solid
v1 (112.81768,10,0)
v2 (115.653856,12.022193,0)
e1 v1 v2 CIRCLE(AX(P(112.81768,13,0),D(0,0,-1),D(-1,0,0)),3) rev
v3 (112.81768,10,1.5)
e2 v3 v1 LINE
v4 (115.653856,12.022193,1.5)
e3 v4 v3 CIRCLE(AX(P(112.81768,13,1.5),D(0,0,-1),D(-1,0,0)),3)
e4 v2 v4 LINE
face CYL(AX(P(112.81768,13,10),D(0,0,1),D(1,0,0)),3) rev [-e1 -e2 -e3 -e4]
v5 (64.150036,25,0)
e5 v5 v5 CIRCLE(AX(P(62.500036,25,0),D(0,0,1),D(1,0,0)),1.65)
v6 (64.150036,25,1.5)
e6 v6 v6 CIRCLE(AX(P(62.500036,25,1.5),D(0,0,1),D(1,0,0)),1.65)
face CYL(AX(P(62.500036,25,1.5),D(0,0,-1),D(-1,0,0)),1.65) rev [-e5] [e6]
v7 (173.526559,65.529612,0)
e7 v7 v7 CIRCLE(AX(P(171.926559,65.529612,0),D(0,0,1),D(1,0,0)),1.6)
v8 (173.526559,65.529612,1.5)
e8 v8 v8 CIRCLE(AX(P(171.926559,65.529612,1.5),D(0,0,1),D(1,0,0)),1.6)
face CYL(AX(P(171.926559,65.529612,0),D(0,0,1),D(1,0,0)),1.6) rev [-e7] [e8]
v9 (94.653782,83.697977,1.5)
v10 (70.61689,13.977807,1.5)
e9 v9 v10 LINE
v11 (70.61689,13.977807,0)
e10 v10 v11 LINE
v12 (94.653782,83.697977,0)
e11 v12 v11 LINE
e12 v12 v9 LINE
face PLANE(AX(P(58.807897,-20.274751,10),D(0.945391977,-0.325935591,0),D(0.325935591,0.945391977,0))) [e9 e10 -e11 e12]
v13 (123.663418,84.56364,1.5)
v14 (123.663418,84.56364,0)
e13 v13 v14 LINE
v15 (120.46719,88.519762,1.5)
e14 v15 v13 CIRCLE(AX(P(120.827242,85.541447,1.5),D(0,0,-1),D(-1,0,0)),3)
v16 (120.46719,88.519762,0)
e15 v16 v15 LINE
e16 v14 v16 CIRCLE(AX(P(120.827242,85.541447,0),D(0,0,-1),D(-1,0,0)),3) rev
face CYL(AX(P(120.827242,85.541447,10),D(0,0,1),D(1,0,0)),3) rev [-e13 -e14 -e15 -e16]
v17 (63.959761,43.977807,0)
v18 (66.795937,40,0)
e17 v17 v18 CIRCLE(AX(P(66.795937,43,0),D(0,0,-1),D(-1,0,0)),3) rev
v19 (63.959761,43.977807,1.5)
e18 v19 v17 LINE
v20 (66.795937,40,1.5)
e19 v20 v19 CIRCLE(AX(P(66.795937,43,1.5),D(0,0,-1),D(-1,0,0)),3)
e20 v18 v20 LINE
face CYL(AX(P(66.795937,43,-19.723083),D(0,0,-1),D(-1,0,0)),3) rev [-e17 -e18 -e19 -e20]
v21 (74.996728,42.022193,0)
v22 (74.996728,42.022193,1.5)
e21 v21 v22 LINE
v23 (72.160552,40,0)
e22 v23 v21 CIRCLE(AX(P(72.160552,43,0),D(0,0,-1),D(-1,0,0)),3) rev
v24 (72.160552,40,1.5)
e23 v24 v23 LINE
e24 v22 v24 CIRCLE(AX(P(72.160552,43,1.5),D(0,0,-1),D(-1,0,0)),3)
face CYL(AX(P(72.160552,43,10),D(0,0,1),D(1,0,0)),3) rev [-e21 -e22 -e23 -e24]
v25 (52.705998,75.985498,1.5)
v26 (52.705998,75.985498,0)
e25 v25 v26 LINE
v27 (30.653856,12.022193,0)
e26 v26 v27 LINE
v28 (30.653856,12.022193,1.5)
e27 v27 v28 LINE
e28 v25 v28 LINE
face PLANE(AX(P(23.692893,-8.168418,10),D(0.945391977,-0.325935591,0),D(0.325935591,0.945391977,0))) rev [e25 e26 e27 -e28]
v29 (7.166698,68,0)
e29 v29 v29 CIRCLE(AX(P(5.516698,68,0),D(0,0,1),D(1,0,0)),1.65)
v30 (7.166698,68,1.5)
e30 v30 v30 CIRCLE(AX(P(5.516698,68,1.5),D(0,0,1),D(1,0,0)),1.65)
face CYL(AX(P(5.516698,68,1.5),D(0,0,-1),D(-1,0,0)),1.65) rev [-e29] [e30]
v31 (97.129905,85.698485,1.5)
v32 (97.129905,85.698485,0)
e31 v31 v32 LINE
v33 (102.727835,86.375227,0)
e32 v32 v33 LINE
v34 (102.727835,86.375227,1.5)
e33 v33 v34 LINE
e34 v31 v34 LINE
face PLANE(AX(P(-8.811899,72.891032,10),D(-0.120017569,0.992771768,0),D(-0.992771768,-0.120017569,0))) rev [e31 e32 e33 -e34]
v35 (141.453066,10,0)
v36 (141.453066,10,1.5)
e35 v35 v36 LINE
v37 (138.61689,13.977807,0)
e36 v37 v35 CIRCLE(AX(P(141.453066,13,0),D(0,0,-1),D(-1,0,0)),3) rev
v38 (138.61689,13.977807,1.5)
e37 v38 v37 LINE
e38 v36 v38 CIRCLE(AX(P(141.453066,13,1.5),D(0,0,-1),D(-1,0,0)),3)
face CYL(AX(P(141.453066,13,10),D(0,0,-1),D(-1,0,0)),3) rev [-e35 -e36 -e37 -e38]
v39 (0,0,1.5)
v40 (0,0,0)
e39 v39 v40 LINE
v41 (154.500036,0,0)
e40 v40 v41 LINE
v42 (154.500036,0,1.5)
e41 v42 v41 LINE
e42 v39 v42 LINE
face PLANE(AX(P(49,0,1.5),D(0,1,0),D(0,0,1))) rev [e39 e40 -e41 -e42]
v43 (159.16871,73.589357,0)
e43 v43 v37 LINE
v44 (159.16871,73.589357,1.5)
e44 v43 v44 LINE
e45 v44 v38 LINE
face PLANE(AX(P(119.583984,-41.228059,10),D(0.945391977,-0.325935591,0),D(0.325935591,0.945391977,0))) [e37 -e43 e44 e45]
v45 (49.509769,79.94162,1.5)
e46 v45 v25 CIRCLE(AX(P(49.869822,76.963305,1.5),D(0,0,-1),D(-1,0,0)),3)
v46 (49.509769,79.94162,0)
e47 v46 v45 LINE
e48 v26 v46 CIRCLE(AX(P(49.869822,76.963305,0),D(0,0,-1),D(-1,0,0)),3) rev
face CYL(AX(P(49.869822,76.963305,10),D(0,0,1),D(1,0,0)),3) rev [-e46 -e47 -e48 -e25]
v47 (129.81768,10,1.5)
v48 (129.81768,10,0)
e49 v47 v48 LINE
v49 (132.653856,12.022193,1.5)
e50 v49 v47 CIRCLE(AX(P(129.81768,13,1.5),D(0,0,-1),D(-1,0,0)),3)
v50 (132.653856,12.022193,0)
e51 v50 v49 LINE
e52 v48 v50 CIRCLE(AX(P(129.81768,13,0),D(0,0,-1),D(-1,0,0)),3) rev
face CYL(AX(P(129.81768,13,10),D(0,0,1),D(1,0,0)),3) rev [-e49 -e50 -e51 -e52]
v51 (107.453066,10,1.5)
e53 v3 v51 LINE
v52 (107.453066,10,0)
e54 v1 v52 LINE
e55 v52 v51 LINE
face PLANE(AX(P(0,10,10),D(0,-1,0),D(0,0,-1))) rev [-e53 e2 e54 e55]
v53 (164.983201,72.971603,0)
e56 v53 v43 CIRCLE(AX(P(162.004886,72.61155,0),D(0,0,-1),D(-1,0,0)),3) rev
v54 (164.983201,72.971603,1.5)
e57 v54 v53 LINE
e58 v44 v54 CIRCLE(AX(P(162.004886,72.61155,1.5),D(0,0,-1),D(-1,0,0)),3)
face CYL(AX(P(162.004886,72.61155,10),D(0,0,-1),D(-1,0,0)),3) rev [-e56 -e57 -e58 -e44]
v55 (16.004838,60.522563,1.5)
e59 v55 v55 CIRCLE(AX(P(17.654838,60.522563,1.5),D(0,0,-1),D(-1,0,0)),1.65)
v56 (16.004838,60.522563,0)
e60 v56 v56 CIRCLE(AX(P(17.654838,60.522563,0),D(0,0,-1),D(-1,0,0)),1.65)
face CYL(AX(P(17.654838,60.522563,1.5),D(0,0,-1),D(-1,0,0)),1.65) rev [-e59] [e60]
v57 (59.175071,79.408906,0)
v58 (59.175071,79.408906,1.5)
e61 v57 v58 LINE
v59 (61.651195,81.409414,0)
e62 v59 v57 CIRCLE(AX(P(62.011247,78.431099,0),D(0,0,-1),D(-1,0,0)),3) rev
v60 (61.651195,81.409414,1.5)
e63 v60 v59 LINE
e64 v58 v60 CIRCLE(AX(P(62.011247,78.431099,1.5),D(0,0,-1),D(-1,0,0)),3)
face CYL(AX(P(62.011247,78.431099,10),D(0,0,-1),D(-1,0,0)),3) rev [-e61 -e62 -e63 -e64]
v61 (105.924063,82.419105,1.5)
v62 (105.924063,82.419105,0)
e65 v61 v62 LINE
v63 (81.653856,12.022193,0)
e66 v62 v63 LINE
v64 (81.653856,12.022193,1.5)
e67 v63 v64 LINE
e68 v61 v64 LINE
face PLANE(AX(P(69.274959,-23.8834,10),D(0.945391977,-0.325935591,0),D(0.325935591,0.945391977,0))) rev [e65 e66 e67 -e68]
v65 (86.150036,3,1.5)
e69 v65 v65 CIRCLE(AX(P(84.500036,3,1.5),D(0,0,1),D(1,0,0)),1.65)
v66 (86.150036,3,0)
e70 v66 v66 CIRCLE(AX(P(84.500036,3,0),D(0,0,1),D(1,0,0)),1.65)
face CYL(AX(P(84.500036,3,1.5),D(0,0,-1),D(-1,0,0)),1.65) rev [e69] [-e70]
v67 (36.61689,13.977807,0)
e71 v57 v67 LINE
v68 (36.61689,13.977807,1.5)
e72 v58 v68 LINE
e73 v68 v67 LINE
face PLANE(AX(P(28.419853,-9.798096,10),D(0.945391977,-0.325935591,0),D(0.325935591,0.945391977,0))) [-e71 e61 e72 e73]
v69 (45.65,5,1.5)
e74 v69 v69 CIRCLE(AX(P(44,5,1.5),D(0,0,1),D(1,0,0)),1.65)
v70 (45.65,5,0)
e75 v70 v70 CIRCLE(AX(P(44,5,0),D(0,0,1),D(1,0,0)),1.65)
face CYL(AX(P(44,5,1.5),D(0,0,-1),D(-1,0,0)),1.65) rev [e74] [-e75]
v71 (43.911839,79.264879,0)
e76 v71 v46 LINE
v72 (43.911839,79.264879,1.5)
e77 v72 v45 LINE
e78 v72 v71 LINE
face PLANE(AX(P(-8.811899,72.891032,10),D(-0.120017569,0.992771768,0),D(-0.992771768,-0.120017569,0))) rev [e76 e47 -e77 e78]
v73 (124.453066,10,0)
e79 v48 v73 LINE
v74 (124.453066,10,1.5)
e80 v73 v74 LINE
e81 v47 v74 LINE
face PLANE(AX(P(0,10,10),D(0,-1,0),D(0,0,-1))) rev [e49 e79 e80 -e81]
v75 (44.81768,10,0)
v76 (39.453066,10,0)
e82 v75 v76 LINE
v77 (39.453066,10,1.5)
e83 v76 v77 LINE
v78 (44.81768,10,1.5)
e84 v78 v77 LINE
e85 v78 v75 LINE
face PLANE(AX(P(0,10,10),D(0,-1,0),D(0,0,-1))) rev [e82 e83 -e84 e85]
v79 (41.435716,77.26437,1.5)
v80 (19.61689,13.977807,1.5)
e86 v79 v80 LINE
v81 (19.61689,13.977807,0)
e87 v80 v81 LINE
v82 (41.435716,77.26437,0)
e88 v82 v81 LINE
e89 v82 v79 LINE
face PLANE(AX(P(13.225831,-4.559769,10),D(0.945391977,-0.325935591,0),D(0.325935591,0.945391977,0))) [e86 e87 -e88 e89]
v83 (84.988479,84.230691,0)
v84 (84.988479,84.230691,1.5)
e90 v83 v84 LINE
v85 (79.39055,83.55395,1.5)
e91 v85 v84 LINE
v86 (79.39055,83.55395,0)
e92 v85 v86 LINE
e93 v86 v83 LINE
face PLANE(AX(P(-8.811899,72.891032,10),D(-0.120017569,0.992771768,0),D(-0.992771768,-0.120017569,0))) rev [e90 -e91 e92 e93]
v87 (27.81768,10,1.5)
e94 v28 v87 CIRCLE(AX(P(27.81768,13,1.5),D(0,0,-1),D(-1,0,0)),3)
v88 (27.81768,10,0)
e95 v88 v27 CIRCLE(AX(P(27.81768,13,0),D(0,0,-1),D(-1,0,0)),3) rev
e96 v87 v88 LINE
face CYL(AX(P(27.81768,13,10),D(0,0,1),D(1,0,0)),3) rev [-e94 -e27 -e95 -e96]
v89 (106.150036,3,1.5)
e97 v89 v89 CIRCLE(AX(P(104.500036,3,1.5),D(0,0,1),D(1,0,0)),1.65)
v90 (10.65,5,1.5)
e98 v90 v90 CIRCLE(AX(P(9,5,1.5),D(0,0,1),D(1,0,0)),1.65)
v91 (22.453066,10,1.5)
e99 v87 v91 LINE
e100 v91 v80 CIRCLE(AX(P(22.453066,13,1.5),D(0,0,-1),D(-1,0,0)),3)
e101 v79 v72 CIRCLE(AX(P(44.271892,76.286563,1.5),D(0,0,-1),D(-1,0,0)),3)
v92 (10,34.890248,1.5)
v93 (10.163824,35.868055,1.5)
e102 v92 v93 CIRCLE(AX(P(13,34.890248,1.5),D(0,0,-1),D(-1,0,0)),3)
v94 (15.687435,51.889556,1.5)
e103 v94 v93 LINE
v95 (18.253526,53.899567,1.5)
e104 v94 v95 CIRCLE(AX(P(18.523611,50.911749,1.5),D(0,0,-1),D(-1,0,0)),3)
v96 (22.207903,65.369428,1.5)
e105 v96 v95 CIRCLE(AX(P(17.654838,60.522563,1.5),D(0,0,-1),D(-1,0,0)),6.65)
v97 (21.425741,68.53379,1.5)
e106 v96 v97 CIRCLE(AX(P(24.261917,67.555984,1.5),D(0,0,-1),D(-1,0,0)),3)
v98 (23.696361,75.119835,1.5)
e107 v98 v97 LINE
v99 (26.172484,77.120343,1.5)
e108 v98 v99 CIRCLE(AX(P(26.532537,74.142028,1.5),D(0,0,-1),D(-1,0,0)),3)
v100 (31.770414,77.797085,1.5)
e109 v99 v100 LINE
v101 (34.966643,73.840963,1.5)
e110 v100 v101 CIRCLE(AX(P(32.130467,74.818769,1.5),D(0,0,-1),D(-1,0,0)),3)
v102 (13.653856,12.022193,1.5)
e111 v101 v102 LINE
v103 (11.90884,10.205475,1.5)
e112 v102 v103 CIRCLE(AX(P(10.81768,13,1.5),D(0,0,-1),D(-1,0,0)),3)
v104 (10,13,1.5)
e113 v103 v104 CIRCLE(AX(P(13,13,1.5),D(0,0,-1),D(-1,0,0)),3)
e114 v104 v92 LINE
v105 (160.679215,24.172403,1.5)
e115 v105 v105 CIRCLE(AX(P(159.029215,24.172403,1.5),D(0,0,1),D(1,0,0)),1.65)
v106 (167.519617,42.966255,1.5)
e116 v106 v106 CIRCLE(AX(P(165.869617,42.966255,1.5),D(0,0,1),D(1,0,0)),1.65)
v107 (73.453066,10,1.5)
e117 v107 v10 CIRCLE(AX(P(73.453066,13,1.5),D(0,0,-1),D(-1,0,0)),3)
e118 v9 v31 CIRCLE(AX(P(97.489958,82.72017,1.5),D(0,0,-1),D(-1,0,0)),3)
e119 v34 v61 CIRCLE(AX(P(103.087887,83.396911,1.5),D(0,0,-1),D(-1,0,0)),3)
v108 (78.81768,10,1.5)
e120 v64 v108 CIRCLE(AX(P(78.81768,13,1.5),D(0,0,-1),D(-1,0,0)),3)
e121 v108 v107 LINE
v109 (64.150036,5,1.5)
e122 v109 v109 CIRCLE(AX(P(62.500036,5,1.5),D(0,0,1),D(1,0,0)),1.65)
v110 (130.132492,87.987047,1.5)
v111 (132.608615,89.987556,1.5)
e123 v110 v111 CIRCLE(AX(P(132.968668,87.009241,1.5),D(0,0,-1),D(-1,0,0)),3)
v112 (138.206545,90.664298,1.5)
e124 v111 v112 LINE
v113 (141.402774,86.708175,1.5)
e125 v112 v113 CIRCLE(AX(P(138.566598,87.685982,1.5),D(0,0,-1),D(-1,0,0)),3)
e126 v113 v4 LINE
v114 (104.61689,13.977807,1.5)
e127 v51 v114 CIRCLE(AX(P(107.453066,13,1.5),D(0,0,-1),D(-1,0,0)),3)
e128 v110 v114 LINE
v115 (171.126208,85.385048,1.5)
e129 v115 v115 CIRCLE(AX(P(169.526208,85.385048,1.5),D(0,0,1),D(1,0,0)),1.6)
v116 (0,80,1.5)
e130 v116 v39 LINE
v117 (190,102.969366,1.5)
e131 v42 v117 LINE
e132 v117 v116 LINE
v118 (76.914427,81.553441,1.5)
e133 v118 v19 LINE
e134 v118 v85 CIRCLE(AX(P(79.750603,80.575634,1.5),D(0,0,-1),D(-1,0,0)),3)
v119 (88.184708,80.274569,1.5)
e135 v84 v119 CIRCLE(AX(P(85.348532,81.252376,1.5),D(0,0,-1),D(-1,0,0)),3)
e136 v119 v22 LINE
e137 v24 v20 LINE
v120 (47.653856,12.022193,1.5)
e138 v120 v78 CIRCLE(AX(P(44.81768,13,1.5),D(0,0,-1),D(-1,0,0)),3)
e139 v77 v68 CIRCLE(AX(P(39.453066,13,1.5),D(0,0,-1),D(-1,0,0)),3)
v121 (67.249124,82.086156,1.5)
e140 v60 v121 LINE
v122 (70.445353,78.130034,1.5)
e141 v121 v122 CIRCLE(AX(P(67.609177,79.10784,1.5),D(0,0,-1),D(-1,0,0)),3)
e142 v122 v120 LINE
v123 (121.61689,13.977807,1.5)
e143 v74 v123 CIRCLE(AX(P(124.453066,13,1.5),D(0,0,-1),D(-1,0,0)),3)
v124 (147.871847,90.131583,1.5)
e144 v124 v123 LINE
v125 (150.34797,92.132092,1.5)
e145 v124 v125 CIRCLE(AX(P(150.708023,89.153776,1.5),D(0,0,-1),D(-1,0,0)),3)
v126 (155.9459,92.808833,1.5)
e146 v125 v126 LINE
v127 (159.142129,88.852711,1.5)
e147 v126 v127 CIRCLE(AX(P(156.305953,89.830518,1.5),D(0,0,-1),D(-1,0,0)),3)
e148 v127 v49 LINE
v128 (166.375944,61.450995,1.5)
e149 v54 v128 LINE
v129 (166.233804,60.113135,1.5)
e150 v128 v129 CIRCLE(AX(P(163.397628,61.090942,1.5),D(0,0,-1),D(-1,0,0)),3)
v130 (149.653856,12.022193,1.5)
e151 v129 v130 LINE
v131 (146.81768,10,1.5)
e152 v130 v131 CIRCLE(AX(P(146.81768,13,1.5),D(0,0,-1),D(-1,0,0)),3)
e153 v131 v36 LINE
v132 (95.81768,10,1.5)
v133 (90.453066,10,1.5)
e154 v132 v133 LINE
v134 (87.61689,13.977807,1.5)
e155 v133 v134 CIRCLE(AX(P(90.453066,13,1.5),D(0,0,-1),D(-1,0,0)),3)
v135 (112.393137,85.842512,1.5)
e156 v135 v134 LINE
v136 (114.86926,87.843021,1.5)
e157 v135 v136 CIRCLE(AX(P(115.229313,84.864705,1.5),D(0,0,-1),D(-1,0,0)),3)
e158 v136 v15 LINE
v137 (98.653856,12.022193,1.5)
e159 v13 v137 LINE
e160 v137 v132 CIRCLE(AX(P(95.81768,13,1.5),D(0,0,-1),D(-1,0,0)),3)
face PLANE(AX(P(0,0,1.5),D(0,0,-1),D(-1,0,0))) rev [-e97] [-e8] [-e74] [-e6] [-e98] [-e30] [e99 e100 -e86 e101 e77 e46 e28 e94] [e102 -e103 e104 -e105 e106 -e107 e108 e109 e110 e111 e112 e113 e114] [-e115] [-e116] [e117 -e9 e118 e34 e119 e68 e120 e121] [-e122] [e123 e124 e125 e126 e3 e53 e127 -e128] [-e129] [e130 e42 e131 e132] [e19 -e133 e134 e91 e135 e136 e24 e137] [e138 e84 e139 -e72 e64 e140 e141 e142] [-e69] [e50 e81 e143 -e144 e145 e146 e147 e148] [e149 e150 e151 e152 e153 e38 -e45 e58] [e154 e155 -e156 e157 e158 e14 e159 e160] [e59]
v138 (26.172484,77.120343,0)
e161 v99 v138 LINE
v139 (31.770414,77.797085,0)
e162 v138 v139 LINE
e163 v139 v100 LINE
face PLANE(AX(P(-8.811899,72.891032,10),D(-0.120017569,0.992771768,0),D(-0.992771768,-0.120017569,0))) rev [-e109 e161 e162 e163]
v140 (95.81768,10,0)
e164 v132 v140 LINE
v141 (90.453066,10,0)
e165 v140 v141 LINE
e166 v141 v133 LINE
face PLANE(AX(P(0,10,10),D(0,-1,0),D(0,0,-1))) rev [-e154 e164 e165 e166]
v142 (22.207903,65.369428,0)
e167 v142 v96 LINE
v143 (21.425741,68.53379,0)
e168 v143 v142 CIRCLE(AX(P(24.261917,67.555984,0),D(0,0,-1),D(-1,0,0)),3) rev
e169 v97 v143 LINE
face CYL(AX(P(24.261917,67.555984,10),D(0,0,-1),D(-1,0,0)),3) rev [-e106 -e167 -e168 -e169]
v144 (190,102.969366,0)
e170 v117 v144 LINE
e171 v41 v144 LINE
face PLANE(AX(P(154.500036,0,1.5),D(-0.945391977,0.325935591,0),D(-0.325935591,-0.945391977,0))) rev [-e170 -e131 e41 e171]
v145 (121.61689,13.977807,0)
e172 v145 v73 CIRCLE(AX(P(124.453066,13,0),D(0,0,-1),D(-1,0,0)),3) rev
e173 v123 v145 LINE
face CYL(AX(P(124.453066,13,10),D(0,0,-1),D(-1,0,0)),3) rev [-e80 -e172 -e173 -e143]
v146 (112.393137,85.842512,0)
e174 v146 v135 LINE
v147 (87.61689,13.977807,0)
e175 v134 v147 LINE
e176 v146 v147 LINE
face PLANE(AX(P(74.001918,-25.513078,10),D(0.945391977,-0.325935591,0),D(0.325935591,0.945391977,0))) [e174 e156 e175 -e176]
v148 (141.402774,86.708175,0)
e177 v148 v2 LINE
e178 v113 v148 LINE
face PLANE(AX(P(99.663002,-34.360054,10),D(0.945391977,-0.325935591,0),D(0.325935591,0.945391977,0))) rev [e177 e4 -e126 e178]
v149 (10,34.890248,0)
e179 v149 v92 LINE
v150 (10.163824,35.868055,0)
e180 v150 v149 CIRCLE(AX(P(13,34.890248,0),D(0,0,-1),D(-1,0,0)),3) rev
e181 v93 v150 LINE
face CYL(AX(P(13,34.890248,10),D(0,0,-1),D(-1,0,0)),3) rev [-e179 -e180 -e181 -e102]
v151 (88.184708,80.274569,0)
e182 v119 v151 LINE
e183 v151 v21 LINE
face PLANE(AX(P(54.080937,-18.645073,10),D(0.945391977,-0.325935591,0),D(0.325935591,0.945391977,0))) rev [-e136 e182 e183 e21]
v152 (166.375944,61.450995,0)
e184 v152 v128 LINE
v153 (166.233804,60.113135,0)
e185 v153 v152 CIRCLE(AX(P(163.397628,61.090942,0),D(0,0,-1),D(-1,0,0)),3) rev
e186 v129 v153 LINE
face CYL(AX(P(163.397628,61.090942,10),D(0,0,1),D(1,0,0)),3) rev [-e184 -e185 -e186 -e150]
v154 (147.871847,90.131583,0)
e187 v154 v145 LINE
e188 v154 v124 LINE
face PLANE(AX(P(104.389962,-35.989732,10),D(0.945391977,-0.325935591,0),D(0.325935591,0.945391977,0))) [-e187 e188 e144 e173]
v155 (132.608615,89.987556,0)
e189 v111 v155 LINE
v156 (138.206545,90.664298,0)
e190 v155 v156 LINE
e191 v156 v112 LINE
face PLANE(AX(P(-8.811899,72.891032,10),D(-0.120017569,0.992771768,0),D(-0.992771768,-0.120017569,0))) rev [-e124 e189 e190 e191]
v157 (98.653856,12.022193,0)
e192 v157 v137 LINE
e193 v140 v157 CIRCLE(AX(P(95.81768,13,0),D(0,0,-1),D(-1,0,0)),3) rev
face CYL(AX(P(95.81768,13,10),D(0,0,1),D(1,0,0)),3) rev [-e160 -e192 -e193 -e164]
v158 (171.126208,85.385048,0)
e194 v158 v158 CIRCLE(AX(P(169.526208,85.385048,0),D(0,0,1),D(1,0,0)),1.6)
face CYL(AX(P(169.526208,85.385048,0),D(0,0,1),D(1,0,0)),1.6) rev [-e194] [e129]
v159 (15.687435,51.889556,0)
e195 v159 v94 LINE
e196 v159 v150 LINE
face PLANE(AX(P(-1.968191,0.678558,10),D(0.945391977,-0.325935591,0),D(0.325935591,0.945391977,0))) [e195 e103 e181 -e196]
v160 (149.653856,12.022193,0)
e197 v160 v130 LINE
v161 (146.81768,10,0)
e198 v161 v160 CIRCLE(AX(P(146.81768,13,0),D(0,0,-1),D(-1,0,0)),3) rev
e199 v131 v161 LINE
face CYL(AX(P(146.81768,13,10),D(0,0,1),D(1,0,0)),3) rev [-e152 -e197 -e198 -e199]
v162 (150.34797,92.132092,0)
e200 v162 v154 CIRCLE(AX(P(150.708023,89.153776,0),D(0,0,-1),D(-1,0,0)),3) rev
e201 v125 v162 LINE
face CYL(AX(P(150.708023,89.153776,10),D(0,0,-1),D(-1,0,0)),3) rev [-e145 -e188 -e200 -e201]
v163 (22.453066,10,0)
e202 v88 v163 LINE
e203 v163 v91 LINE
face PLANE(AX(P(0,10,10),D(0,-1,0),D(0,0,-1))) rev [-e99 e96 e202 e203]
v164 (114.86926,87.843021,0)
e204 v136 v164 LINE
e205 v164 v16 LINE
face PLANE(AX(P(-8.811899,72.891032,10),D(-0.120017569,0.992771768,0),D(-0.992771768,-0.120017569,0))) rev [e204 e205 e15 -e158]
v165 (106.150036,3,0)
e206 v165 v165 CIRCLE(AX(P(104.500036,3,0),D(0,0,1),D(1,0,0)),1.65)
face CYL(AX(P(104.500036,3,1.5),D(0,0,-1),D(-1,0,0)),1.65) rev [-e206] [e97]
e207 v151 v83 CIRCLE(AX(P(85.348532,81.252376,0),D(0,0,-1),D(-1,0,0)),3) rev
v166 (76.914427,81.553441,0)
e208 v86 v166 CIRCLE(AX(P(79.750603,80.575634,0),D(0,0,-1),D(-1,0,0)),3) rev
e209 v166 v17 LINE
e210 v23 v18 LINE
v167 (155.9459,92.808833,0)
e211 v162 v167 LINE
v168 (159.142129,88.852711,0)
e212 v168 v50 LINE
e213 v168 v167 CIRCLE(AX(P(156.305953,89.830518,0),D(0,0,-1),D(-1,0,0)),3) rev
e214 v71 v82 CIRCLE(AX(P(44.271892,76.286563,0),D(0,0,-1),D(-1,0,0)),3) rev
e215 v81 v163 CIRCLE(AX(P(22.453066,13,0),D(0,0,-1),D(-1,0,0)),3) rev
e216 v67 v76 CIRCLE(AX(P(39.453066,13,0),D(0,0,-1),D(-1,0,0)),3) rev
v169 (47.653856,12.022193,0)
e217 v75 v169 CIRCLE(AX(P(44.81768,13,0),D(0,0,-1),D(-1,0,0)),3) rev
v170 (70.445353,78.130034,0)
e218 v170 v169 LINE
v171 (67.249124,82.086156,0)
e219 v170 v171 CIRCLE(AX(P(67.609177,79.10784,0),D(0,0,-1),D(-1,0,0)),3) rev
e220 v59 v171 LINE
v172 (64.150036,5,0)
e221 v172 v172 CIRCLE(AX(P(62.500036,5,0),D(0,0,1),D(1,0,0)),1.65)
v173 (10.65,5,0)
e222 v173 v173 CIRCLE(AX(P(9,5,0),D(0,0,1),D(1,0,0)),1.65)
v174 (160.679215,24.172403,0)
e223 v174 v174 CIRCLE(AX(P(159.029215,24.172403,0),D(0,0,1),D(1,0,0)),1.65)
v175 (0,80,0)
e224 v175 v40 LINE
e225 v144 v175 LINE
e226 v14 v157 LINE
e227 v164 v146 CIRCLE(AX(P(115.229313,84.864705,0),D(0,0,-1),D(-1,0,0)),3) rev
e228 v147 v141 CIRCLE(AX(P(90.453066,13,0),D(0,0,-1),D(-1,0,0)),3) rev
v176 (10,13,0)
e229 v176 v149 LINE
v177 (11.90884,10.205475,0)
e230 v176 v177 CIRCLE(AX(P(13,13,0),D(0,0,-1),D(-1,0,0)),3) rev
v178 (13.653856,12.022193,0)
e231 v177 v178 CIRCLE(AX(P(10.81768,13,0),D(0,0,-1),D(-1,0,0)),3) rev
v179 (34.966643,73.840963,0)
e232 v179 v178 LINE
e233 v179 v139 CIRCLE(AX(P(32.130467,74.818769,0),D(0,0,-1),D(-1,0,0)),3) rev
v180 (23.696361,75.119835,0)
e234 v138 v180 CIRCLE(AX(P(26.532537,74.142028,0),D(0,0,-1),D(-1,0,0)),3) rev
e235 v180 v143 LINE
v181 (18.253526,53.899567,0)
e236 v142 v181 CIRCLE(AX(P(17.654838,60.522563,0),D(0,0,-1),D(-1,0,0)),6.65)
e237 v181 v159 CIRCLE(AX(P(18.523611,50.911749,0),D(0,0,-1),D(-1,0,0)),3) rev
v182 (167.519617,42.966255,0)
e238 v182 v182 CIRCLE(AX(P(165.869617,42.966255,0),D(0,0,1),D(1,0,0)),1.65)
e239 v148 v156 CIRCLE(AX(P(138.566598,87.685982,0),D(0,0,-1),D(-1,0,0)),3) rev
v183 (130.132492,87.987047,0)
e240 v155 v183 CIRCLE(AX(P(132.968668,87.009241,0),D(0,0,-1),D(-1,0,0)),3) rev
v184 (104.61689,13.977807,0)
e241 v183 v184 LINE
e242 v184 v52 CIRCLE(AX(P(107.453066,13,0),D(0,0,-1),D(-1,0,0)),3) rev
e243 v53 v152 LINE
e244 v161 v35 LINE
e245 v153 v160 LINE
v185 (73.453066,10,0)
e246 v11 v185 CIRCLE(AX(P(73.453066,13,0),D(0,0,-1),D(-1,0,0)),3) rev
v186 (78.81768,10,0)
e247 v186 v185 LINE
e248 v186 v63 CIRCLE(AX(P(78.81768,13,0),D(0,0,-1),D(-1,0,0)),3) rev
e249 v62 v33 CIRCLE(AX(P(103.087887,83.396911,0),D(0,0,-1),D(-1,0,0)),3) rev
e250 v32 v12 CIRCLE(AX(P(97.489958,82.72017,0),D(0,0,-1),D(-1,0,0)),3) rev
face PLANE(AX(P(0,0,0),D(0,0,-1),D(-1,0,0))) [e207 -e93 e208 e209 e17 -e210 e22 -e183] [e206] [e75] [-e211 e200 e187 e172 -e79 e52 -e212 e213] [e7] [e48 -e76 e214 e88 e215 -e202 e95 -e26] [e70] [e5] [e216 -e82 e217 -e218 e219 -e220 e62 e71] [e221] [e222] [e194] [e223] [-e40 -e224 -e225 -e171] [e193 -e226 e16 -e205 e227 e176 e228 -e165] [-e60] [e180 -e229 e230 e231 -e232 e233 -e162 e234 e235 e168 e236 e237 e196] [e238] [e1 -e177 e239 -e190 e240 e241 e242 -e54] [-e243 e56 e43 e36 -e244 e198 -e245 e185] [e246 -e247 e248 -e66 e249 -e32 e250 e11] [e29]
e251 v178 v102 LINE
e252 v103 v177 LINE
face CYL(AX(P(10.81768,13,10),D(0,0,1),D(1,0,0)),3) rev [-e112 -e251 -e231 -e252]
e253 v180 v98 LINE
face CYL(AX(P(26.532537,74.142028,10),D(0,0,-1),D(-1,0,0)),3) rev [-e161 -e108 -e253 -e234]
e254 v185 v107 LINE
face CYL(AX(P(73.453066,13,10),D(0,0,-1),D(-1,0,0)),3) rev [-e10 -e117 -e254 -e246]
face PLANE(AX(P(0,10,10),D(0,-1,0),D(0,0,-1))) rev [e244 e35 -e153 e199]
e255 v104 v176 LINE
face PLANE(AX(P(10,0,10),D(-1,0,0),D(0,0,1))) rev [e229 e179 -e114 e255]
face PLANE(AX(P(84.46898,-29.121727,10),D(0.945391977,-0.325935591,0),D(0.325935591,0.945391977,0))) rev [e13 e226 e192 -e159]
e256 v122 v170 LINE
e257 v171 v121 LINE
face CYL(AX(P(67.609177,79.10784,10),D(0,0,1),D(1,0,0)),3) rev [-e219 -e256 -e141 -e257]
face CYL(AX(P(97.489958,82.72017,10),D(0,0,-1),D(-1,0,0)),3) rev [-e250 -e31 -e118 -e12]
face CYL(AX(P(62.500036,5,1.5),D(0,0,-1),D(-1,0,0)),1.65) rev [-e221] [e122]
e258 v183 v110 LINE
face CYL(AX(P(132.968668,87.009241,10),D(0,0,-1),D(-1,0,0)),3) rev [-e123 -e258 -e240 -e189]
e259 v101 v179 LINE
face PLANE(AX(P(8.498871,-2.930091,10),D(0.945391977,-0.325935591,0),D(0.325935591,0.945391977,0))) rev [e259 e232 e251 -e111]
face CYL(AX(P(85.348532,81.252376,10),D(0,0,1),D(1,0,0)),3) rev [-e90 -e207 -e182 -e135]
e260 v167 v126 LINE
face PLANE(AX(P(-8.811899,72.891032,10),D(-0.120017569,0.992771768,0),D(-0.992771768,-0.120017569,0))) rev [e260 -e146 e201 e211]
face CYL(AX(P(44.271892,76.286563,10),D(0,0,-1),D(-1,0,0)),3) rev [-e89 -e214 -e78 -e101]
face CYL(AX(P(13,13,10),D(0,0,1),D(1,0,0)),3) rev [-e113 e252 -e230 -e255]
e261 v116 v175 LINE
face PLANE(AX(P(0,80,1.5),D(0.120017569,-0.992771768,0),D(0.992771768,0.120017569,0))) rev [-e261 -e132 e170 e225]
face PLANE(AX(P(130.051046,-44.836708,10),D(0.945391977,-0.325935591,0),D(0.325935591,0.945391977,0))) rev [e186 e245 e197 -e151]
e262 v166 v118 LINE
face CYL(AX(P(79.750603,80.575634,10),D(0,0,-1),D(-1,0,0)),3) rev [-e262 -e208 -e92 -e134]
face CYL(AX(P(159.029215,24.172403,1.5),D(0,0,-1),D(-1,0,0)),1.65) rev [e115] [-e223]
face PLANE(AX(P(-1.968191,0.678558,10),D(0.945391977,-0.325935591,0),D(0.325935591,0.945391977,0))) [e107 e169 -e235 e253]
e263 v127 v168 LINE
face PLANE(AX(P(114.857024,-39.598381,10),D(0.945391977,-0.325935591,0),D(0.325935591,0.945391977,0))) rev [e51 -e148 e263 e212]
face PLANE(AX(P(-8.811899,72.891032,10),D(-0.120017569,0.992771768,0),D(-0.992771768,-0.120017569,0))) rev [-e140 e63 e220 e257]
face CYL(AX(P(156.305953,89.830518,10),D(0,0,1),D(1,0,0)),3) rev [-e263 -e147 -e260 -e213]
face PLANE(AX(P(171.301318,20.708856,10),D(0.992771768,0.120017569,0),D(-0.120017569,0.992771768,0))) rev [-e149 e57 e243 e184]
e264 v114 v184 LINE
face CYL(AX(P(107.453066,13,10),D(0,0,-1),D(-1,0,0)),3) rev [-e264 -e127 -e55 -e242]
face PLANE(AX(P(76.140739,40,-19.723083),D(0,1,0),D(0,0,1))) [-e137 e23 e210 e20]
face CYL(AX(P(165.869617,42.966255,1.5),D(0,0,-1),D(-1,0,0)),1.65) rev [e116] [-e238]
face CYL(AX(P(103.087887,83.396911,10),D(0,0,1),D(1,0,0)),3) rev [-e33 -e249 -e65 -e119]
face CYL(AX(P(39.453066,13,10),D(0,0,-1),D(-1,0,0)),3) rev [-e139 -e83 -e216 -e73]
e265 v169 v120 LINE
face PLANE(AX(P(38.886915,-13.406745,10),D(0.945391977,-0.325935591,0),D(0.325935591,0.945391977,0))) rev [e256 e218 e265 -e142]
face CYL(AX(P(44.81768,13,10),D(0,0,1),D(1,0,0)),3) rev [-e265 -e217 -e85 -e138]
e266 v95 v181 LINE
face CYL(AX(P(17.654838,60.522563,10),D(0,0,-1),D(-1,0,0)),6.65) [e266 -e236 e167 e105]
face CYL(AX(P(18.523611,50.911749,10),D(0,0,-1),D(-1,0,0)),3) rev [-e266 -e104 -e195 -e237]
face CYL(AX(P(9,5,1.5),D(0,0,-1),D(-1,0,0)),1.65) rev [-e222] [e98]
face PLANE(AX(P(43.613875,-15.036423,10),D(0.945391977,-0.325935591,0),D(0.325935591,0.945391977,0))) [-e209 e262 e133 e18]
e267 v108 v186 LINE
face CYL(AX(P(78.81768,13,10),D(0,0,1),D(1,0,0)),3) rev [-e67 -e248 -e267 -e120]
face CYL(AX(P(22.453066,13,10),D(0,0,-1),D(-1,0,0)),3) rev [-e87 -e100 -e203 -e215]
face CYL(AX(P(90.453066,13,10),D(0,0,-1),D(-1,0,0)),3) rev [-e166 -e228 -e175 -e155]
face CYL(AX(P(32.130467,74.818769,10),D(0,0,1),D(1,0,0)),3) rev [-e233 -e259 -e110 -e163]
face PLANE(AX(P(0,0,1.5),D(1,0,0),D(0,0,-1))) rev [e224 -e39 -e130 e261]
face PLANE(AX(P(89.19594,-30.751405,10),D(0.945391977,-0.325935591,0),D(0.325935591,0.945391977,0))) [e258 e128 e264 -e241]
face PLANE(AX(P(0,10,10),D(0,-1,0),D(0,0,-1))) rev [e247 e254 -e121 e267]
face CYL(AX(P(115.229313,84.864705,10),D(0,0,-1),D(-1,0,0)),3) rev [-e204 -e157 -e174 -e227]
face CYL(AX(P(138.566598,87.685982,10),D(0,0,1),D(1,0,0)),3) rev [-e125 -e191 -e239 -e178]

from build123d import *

# Parameters (mm, degrees)
SKETCH_1_R          = 1.65
EXTRUDE_1_DEPTH     = 1.5
SKETCH_2_R          = 1.65
CUT_EXTRUDE_1_DEPTH = 217.113258134
SKETCH_5_R          = 1.6
CUT_EXTRUDE_3_DEPTH = 217.113258134
CUT_EXTRUDE_4_DEPTH = 10
FILLET_3_R          = 3
FILLET_4_R          = 5
SKETCH_7_W          = 17
SKETCH_7_H          = 10
EXTRUDE_2_DEPTH     = 1.5
FILLET_5_R          = 3


with BuildPart() as part:
    # 草图1 → 凸台-拉伸1 (new body)
    with BuildSketch(Plane.XY):
        Polygon((0, 0), (49, 0), (154.500036, 0), (190, 102.969366032), (0, 80), align=None)
        with Locations((44, 5)):
            Circle(SKETCH_1_R, mode=Mode.SUBTRACT)
        with Locations((9, 5)):
            Circle(SKETCH_1_R, mode=Mode.SUBTRACT)
        with Locations((62.500036, 5)):
            Circle(SKETCH_1_R, mode=Mode.SUBTRACT)
        with Locations((62.500036, 25)):
            Circle(SKETCH_1_R, mode=Mode.SUBTRACT)
        with Locations((84.500036, 3)):
            Circle(SKETCH_1_R, mode=Mode.SUBTRACT)
        with Locations((104.500036, 3)):
            Circle(SKETCH_1_R, mode=Mode.SUBTRACT)
        with Locations((159.029214579, 24.172402674)):
            Circle(SKETCH_1_R, mode=Mode.SUBTRACT)
        with Locations((165.869617446, 42.96625509)):
            Circle(SKETCH_1_R, mode=Mode.SUBTRACT)
        with Locations((5.51669804, 68)):
            Circle(SKETCH_1_R, mode=Mode.SUBTRACT)
    extrude(amount=EXTRUDE_1_DEPTH)

    # 草图2 → 切除-拉伸1 (cut, through all)
    with BuildSketch(Plane(origin=(0, 0, 0), x_dir=(-1, 0, 0), z_dir=(0, 0, -1))):
        with Locations((-17.654838092, 60.522562577)):
            Circle(SKETCH_2_R)
    extrude(amount=-CUT_EXTRUDE_1_DEPTH, mode=Mode.SUBTRACT)

    # 草图5 → 切除-拉伸3 (cut, through all)
    with BuildSketch(Plane.XY.offset(1.5)):
        with Locations((169.526207601, 85.385047705)):
            Circle(SKETCH_5_R)
        with Locations((171.926558982, 65.529612347)):
            Circle(SKETCH_5_R)
    extrude(amount=-CUT_EXTRUDE_3_DEPTH, mode=Mode.SUBTRACT)

    # 草图6 → 切除-拉伸4 (cut)
    with BuildSketch(Plane(origin=(0, 0, 0), x_dir=(-1, 0, 0), z_dir=(0, 0, -1))):
        Polygon((-166.458788313, 60.765712768), (-148.956680209, 10), (-137.24549175, 10), (-163.418370686, 85.91570378), align=None)
        Polygon((-160.704378524, 93.384092174), (-131.956680209, 10), (-120.24549175, 10), (-148.483853144, 91.90673575), align=None)
        Polygon((-142.96502336, 91.23955669), (-114.956680209, 10), (-103.24549175, 10), (-130.74449798, 89.762200266), align=None)
        Polygon((-125.225668197, 89.095021206), (-97.956680209, 10), (-86.24549175, 10), (-113.005142817, 87.617664782), align=None)
        Polygon((-107.486313033, 86.950485723), (-80.956680209, 10), (-69.24549175, 10), (-95.265787653, 85.473129299), align=None)
        with BuildLine():
            Line((-77.526432489, 83.328593815), (-89.746957869, 84.805950239))
            Line((-89.746957869, 84.805950239), (-69.149740199, 25.062722173))
            ThreePointArc((-69.149740199, 25.062722173), (-65.935444688, 30.69389736), (-59.455145067, 30.91194885))
            Line((-59.455145067, 30.91194885), (-77.526432489, 83.328593815))
        make_face()
        with BuildLine():
            Line((-12.956680209, 10), (-10, 10))
            Line((-10, 10), (-10, 35.392875452))
            Line((-10, 35.392875452), (-16.411528112, 53.989823466))
            ThreePointArc((-16.411528112, 53.989823466), (-23.94169474, 58.355090898), (-20.701647581, 66.4335229))
            Line((-20.701647581, 66.4335229), (-24.308366998, 76.894987363))
            Line((-24.308366998, 76.894987363), (-36.528892378, 78.372343787))
            Line((-36.528892378, 78.372343787), (-12.956680209, 10))
        make_face()
        Polygon((-72.007602706, 82.661414755), (-46.956680209, 10), (-35.24549175, 10), (-59.787077326, 81.184058331), align=None)
        Polygon((-29.956680209, 10), (-18.24549175, 10), (-42.047722162, 79.039522847), (-54.268247542, 80.516879271), align=None)
    extrude(amount=-CUT_EXTRUDE_4_DEPTH, mode=Mode.SUBTRACT)

    # 圆角3
    # the kernel refuses this fillet: 3 mm, written as the material it adds along each edge
    with BuildSketch(Plane(origin=(89.746957869, 84.805950239, 0), x_dir=(-0.32593559085415924, -0.9453919772319576, 0), z_dir=(0, 0, 1)), Plane(origin=(107.486313033, 86.950485723, 0), x_dir=(-0.32593559085416013, -0.9453919772319572, 0), z_dir=(0, 0, 1)), Plane(origin=(54.268247542, 80.516879271, 0), x_dir=(-0.32593559085415885, -0.9453919772319577, 0), z_dir=(0, 0, 1)), Plane(origin=(125.225668197, 89.095021206, 0), x_dir=(-0.32593559085416013, -0.9453919772319572, 0), z_dir=(0, 0, 1)), Plane(origin=(142.96502336, 91.23955669, 0), x_dir=(-0.3259355908541637, -0.945391977231956, 0), z_dir=(0, 0, 1)), Plane(origin=(36.528892378, 78.372343787, 0), x_dir=(-0.32593559085416013, -0.9453919772319572, 0), z_dir=(0, 0, 1))) as fillet_3_piece_1:
        with BuildLine():
            CenterArc((FILLET_3_R * 1.59770807733, -FILLET_3_R), FILLET_3_R, 90, 115.915383649)
            Line((FILLET_3_R * 0.698267610033, -FILLET_3_R * 1.43704329967), (0, 0))
            Line((0, 0), (FILLET_3_R * 1.59770807733, 0))
        make_face()
    extrude(amount=1.5)
    with BuildSketch(Plane(origin=(77.526432489, 83.328593815, 0), x_dir=(-0.32593559085416024, -0.9453919772319572, 0), z_dir=(0, 0, 1))) as fillet_3_piece_2:
        with BuildLine():
            CenterArc((FILLET_3_R * 0.625896566582, FILLET_3_R), FILLET_3_R, 205.915383649, 64.084616351)
            Line((-FILLET_3_R * 0.273543900714, FILLET_3_R * 0.562956700325), (0, 0))
            Line((0, 0), (FILLET_3_R * 0.625896566582, 0))
        make_face()
    extrude(amount=1.5)
    with BuildSketch(Plane(origin=(95.265787653, 85.473129299, 0), x_dir=(0.9927717678876198, 0.12001756906924078, 0), z_dir=(0, 0, 1)), Plane(origin=(42.047722162, 79.039522847, 0), x_dir=(0.9927717678876197, 0.12001756906924214, 0), z_dir=(0, 0, 1)), Plane(origin=(59.787077326, 81.184058331, 0), x_dir=(0.9927717678876204, 0.12001756906923514, 0), z_dir=(0, 0, 1)), Plane(origin=(148.483853144, 91.90673575, 0), x_dir=(0.9927717678876198, 0.12001756906924078, 0), z_dir=(0, 0, 1)), Plane(origin=(113.005142817, 87.617664782, 0), x_dir=(0.9927717678876197, 0.12001756906924169, 0), z_dir=(0, 0, 1)), Plane(origin=(130.74449798, 89.762200266, 0), x_dir=(0.9927717678876193, 0.1200175690692444, 0), z_dir=(0, 0, 1)), Plane(origin=(24.308366998, 76.894987363, 0), x_dir=(0.9927717678876197, 0.12001756906924214, 0), z_dir=(0, 0, 1))) as fillet_3_piece_3:
        with BuildLine():
            CenterArc((FILLET_3_R * 0.625896566582, -FILLET_3_R), FILLET_3_R, 90, 64.084616351)
            Line((-FILLET_3_R * 0.273543900714, -FILLET_3_R * 0.562956700325), (0, 0))
            Line((0, 0), (FILLET_3_R * 0.625896566582, 0))
        make_face()
    extrude(amount=1.5)
    with BuildSketch(Plane(origin=(69.24549175, 10, 0), x_dir=(0.3259355908541607, 0.9453919772319569, 0), z_dir=(0, 0, 1)), Plane(origin=(35.24549175, 10, 0), x_dir=(0.3259355908541611, 0.9453919772319569, 0), z_dir=(0, 0, 1)), Plane(origin=(120.24549175, 10, 0), x_dir=(0.3259355908541582, 0.9453919772319579, 0), z_dir=(0, 0, 1)), Plane(origin=(137.24549175, 10, 0), x_dir=(0.3259355908541602, 0.9453919772319572, 0), z_dir=(0, 0, 1)), Plane(origin=(86.24549175, 10, 0), x_dir=(0.3259355908541607, 0.9453919772319569, 0), z_dir=(0, 0, 1)), Plane(origin=(103.24549175, 10, 0), x_dir=(0.3259355908541607, 0.9453919772319569, 0), z_dir=(0, 0, 1))) as fillet_3_piece_4:
        with BuildLine():
            CenterArc((FILLET_3_R * 1.40252469112, -FILLET_3_R), FILLET_3_R, 90, 109.022267108)
            Line((FILLET_3_R * 0.457132713888, -FILLET_3_R * 1.32593559085), (0, 0))
            Line((0, 0), (FILLET_3_R * 1.40252469112, 0))
        make_face()
    extrude(amount=1.5)
    with BuildSketch(Plane(origin=(80.956680209, 10, 0), x_dir=(0.32593559085415746, 0.9453919772319582, 0), z_dir=(0, 0, 1)), Plane(origin=(97.956680209, 10, 0), x_dir=(0.32593559085415946, 0.9453919772319574, 0), z_dir=(0, 0, 1)), Plane(origin=(114.956680209, 10, 0), x_dir=(0.3259355908541564, 0.9453919772319586, 0), z_dir=(0, 0, 1)), Plane(origin=(12.956680209, 10, 0), x_dir=(0.3259355908541589, 0.9453919772319578, 0), z_dir=(0, 0, 1))) as fillet_3_piece_5:
        with BuildLine():
            CenterArc((FILLET_3_R * 0.7129999253, FILLET_3_R), FILLET_3_R, 199.022267108, 70.977732892)
            Line((-FILLET_3_R * 0.232392051932, FILLET_3_R * 0.674064409146), (0, 0))
            Line((0, 0), (FILLET_3_R * 0.7129999253, 0))
        make_face()
    extrude(amount=1.5)
    with BuildSketch(Plane(origin=(18.24549175, 10, 0), x_dir=(1, 0, 0), z_dir=(0, 0, 1))) as fillet_3_piece_6:
        with BuildLine():
            CenterArc((FILLET_3_R * 1.40252469112, FILLET_3_R), FILLET_3_R, 160.977732892, 109.022267108)
            Line((FILLET_3_R * 0.457132713888, FILLET_3_R * 1.32593559085), (0, 0))
            Line((0, 0), (FILLET_3_R * 1.40252469112, 0))
        make_face()
    extrude(amount=1.5)
    with BuildSketch(Plane(origin=(29.956680209, 10, 0), x_dir=(-1, 0, 0), z_dir=(0, 0, 1)), Plane(origin=(46.956680209, 10, 0), x_dir=(-1, 0, 0), z_dir=(0, 0, 1)), Plane(origin=(131.956680209, 10, 0), x_dir=(-1, 0, 0), z_dir=(0, 0, 1)), Plane(origin=(148.956680209, 10, 0), x_dir=(-1, 0, 0), z_dir=(0, 0, 1))) as fillet_3_piece_7:
        with BuildLine():
            CenterArc((FILLET_3_R * 0.7129999253, -FILLET_3_R), FILLET_3_R, 90, 70.977732892)
            Line((-FILLET_3_R * 0.232392051932, -FILLET_3_R * 0.674064409146), (0, 0))
            Line((0, 0), (FILLET_3_R * 0.7129999253, 0))
        make_face()
    extrude(amount=1.5)
    with BuildSketch(Plane(origin=(72.007602706, 82.661414755, 0), x_dir=(-0.9927717678876198, -0.12001756906924071, 0), z_dir=(0, 0, 1)), Plane(origin=(160.704378524, 93.384092174, 0), x_dir=(-0.9927717678876197, -0.12001756906924108, 0), z_dir=(0, 0, 1))) as fillet_3_piece_8:
        with BuildLine():
            CenterArc((FILLET_3_R * 1.59770807733, FILLET_3_R), FILLET_3_R, 154.084616351, 115.915383649)
            Line((FILLET_3_R * 0.698267610033, FILLET_3_R * 1.43704329967), (0, 0))
            Line((0, 0), (FILLET_3_R * 1.59770807733, 0))
        make_face()
    extrude(amount=1.5)
    with BuildSketch(Plane(origin=(166.458788313, 60.765712768, 0), x_dir=(-0.3259355908541462, -0.9453919772319621, 0), z_dir=(0, 0, 1))) as fillet_3_piece_9:
        with BuildLine():
            CenterArc((FILLET_3_R * 0.230090548875, -FILLET_3_R), FILLET_3_R, 90, 25.915383649)
            Line((-FILLET_3_R * 0.2069527508, -FILLET_3_R * 0.100559532704), (0, 0))
            Line((0, 0), (FILLET_3_R * 0.230090548875, 0))
        make_face()
    extrude(amount=1.5)
    with BuildSketch(Plane(origin=(163.418370686, 85.91570378, 0), x_dir=(-0.3259355908541588, -0.9453919772319578, 0), z_dir=(0, 0, 1))) as fillet_3_piece_10:
        with BuildLine():
            CenterArc((FILLET_3_R * 4.34611506162, FILLET_3_R), FILLET_3_R, 115.915383649, 154.084616351)
            Line((FILLET_3_R * 3.90907176194, FILLET_3_R * 1.8994404673), (0, 0))
            Line((0, 0), (FILLET_3_R * 4.34611506162, 0))
        make_face()
    extrude(amount=1.5)
    with BuildSketch(Plane(origin=(20.701647581, 66.4335229, 0), x_dir=(0.3259355908541343, 0.9453919772319662, 0), z_dir=(0, 0, 1))) as fillet_3_piece_11:
        with BuildLine():
            CenterArc((2.221583802, -3), FILLET_3_R, 90, 65.812499939)
            ThreePointArc((-0.515044774, -1.770827906), (-0.195837699, -0.903354926), (0, 0))
            Line((0, 0), (2.221583802, 0))
        make_face()
    extrude(amount=1.5)
    with BuildSketch(Plane(origin=(16.411528112, 53.989823466, 0), x_dir=(0.9988016907645847, -0.04894060201720955, 0), z_dir=(0, 0, 1))) as fillet_3_piece_12:
        with BuildLine():
            CenterArc((2.260194582, -2.971019192), FILLET_3_R, 97.970443489, 65.812499939)
            Line((-0.620437185, -2.133188292), (0, 0))
            ThreePointArc((0, 0), (0.922103925, -0.064240792), (1.84420785, 0))
        make_face()
    extrude(amount=1.5)
    with BuildSketch(Plane(origin=(10, 35.392875452, 0), x_dir=(0.3259355908541632, 0.9453919772319561, 0), z_dir=(0, 0, 1))) as fillet_3_piece_13:
        with BuildLine():
            CenterArc((FILLET_3_R * 0.167542374323, -FILLET_3_R), FILLET_3_R, 90, 19.022267108)
            Line((-FILLET_3_R * 0.158393216531, -FILLET_3_R * 0.054608022768), (0, 0))
            Line((0, 0), (FILLET_3_R * 0.167542374323, 0))
        make_face()
    extrude(amount=1.5)
    with BuildSketch(Plane(origin=(10, 10, 0), x_dir=(0, 1, 0), z_dir=(0, 0, 1))) as fillet_3_piece_14:
        with BuildLine():
            CenterArc((FILLET_3_R, -FILLET_3_R), FILLET_3_R, 90, 90)
            Line((0, -FILLET_3_R), (0, 0))
            Line((0, 0), (FILLET_3_R, 0))
        make_face()
    extrude(amount=1.5)

    # 圆角4
    fillet_4_edges = [part.edges().sort_by_distance(p)[0] for p in [
        (69.149740199, 25.062722173, 0.75),
    ]]
    fillet(fillet_4_edges, radius=FILLET_4_R)

    # 草图7 → 凸台-拉伸2 (add)
    with BuildSketch(Plane.XY.offset(1.5)):
        with Locations((67.640739409, 35)):
            Rectangle(SKETCH_7_W, SKETCH_7_H)
    extrude(amount=-EXTRUDE_2_DEPTH)

    # 圆角5
    fillet_5_edges = [part.edges().sort_by_distance(p)[0] for p in [
        (62.588363238, 40, 0.75),
        (74.299551697, 40, 0.75),
    ]]
    fillet(fillet_5_edges, radius=FILLET_5_R)


solid = part.part
